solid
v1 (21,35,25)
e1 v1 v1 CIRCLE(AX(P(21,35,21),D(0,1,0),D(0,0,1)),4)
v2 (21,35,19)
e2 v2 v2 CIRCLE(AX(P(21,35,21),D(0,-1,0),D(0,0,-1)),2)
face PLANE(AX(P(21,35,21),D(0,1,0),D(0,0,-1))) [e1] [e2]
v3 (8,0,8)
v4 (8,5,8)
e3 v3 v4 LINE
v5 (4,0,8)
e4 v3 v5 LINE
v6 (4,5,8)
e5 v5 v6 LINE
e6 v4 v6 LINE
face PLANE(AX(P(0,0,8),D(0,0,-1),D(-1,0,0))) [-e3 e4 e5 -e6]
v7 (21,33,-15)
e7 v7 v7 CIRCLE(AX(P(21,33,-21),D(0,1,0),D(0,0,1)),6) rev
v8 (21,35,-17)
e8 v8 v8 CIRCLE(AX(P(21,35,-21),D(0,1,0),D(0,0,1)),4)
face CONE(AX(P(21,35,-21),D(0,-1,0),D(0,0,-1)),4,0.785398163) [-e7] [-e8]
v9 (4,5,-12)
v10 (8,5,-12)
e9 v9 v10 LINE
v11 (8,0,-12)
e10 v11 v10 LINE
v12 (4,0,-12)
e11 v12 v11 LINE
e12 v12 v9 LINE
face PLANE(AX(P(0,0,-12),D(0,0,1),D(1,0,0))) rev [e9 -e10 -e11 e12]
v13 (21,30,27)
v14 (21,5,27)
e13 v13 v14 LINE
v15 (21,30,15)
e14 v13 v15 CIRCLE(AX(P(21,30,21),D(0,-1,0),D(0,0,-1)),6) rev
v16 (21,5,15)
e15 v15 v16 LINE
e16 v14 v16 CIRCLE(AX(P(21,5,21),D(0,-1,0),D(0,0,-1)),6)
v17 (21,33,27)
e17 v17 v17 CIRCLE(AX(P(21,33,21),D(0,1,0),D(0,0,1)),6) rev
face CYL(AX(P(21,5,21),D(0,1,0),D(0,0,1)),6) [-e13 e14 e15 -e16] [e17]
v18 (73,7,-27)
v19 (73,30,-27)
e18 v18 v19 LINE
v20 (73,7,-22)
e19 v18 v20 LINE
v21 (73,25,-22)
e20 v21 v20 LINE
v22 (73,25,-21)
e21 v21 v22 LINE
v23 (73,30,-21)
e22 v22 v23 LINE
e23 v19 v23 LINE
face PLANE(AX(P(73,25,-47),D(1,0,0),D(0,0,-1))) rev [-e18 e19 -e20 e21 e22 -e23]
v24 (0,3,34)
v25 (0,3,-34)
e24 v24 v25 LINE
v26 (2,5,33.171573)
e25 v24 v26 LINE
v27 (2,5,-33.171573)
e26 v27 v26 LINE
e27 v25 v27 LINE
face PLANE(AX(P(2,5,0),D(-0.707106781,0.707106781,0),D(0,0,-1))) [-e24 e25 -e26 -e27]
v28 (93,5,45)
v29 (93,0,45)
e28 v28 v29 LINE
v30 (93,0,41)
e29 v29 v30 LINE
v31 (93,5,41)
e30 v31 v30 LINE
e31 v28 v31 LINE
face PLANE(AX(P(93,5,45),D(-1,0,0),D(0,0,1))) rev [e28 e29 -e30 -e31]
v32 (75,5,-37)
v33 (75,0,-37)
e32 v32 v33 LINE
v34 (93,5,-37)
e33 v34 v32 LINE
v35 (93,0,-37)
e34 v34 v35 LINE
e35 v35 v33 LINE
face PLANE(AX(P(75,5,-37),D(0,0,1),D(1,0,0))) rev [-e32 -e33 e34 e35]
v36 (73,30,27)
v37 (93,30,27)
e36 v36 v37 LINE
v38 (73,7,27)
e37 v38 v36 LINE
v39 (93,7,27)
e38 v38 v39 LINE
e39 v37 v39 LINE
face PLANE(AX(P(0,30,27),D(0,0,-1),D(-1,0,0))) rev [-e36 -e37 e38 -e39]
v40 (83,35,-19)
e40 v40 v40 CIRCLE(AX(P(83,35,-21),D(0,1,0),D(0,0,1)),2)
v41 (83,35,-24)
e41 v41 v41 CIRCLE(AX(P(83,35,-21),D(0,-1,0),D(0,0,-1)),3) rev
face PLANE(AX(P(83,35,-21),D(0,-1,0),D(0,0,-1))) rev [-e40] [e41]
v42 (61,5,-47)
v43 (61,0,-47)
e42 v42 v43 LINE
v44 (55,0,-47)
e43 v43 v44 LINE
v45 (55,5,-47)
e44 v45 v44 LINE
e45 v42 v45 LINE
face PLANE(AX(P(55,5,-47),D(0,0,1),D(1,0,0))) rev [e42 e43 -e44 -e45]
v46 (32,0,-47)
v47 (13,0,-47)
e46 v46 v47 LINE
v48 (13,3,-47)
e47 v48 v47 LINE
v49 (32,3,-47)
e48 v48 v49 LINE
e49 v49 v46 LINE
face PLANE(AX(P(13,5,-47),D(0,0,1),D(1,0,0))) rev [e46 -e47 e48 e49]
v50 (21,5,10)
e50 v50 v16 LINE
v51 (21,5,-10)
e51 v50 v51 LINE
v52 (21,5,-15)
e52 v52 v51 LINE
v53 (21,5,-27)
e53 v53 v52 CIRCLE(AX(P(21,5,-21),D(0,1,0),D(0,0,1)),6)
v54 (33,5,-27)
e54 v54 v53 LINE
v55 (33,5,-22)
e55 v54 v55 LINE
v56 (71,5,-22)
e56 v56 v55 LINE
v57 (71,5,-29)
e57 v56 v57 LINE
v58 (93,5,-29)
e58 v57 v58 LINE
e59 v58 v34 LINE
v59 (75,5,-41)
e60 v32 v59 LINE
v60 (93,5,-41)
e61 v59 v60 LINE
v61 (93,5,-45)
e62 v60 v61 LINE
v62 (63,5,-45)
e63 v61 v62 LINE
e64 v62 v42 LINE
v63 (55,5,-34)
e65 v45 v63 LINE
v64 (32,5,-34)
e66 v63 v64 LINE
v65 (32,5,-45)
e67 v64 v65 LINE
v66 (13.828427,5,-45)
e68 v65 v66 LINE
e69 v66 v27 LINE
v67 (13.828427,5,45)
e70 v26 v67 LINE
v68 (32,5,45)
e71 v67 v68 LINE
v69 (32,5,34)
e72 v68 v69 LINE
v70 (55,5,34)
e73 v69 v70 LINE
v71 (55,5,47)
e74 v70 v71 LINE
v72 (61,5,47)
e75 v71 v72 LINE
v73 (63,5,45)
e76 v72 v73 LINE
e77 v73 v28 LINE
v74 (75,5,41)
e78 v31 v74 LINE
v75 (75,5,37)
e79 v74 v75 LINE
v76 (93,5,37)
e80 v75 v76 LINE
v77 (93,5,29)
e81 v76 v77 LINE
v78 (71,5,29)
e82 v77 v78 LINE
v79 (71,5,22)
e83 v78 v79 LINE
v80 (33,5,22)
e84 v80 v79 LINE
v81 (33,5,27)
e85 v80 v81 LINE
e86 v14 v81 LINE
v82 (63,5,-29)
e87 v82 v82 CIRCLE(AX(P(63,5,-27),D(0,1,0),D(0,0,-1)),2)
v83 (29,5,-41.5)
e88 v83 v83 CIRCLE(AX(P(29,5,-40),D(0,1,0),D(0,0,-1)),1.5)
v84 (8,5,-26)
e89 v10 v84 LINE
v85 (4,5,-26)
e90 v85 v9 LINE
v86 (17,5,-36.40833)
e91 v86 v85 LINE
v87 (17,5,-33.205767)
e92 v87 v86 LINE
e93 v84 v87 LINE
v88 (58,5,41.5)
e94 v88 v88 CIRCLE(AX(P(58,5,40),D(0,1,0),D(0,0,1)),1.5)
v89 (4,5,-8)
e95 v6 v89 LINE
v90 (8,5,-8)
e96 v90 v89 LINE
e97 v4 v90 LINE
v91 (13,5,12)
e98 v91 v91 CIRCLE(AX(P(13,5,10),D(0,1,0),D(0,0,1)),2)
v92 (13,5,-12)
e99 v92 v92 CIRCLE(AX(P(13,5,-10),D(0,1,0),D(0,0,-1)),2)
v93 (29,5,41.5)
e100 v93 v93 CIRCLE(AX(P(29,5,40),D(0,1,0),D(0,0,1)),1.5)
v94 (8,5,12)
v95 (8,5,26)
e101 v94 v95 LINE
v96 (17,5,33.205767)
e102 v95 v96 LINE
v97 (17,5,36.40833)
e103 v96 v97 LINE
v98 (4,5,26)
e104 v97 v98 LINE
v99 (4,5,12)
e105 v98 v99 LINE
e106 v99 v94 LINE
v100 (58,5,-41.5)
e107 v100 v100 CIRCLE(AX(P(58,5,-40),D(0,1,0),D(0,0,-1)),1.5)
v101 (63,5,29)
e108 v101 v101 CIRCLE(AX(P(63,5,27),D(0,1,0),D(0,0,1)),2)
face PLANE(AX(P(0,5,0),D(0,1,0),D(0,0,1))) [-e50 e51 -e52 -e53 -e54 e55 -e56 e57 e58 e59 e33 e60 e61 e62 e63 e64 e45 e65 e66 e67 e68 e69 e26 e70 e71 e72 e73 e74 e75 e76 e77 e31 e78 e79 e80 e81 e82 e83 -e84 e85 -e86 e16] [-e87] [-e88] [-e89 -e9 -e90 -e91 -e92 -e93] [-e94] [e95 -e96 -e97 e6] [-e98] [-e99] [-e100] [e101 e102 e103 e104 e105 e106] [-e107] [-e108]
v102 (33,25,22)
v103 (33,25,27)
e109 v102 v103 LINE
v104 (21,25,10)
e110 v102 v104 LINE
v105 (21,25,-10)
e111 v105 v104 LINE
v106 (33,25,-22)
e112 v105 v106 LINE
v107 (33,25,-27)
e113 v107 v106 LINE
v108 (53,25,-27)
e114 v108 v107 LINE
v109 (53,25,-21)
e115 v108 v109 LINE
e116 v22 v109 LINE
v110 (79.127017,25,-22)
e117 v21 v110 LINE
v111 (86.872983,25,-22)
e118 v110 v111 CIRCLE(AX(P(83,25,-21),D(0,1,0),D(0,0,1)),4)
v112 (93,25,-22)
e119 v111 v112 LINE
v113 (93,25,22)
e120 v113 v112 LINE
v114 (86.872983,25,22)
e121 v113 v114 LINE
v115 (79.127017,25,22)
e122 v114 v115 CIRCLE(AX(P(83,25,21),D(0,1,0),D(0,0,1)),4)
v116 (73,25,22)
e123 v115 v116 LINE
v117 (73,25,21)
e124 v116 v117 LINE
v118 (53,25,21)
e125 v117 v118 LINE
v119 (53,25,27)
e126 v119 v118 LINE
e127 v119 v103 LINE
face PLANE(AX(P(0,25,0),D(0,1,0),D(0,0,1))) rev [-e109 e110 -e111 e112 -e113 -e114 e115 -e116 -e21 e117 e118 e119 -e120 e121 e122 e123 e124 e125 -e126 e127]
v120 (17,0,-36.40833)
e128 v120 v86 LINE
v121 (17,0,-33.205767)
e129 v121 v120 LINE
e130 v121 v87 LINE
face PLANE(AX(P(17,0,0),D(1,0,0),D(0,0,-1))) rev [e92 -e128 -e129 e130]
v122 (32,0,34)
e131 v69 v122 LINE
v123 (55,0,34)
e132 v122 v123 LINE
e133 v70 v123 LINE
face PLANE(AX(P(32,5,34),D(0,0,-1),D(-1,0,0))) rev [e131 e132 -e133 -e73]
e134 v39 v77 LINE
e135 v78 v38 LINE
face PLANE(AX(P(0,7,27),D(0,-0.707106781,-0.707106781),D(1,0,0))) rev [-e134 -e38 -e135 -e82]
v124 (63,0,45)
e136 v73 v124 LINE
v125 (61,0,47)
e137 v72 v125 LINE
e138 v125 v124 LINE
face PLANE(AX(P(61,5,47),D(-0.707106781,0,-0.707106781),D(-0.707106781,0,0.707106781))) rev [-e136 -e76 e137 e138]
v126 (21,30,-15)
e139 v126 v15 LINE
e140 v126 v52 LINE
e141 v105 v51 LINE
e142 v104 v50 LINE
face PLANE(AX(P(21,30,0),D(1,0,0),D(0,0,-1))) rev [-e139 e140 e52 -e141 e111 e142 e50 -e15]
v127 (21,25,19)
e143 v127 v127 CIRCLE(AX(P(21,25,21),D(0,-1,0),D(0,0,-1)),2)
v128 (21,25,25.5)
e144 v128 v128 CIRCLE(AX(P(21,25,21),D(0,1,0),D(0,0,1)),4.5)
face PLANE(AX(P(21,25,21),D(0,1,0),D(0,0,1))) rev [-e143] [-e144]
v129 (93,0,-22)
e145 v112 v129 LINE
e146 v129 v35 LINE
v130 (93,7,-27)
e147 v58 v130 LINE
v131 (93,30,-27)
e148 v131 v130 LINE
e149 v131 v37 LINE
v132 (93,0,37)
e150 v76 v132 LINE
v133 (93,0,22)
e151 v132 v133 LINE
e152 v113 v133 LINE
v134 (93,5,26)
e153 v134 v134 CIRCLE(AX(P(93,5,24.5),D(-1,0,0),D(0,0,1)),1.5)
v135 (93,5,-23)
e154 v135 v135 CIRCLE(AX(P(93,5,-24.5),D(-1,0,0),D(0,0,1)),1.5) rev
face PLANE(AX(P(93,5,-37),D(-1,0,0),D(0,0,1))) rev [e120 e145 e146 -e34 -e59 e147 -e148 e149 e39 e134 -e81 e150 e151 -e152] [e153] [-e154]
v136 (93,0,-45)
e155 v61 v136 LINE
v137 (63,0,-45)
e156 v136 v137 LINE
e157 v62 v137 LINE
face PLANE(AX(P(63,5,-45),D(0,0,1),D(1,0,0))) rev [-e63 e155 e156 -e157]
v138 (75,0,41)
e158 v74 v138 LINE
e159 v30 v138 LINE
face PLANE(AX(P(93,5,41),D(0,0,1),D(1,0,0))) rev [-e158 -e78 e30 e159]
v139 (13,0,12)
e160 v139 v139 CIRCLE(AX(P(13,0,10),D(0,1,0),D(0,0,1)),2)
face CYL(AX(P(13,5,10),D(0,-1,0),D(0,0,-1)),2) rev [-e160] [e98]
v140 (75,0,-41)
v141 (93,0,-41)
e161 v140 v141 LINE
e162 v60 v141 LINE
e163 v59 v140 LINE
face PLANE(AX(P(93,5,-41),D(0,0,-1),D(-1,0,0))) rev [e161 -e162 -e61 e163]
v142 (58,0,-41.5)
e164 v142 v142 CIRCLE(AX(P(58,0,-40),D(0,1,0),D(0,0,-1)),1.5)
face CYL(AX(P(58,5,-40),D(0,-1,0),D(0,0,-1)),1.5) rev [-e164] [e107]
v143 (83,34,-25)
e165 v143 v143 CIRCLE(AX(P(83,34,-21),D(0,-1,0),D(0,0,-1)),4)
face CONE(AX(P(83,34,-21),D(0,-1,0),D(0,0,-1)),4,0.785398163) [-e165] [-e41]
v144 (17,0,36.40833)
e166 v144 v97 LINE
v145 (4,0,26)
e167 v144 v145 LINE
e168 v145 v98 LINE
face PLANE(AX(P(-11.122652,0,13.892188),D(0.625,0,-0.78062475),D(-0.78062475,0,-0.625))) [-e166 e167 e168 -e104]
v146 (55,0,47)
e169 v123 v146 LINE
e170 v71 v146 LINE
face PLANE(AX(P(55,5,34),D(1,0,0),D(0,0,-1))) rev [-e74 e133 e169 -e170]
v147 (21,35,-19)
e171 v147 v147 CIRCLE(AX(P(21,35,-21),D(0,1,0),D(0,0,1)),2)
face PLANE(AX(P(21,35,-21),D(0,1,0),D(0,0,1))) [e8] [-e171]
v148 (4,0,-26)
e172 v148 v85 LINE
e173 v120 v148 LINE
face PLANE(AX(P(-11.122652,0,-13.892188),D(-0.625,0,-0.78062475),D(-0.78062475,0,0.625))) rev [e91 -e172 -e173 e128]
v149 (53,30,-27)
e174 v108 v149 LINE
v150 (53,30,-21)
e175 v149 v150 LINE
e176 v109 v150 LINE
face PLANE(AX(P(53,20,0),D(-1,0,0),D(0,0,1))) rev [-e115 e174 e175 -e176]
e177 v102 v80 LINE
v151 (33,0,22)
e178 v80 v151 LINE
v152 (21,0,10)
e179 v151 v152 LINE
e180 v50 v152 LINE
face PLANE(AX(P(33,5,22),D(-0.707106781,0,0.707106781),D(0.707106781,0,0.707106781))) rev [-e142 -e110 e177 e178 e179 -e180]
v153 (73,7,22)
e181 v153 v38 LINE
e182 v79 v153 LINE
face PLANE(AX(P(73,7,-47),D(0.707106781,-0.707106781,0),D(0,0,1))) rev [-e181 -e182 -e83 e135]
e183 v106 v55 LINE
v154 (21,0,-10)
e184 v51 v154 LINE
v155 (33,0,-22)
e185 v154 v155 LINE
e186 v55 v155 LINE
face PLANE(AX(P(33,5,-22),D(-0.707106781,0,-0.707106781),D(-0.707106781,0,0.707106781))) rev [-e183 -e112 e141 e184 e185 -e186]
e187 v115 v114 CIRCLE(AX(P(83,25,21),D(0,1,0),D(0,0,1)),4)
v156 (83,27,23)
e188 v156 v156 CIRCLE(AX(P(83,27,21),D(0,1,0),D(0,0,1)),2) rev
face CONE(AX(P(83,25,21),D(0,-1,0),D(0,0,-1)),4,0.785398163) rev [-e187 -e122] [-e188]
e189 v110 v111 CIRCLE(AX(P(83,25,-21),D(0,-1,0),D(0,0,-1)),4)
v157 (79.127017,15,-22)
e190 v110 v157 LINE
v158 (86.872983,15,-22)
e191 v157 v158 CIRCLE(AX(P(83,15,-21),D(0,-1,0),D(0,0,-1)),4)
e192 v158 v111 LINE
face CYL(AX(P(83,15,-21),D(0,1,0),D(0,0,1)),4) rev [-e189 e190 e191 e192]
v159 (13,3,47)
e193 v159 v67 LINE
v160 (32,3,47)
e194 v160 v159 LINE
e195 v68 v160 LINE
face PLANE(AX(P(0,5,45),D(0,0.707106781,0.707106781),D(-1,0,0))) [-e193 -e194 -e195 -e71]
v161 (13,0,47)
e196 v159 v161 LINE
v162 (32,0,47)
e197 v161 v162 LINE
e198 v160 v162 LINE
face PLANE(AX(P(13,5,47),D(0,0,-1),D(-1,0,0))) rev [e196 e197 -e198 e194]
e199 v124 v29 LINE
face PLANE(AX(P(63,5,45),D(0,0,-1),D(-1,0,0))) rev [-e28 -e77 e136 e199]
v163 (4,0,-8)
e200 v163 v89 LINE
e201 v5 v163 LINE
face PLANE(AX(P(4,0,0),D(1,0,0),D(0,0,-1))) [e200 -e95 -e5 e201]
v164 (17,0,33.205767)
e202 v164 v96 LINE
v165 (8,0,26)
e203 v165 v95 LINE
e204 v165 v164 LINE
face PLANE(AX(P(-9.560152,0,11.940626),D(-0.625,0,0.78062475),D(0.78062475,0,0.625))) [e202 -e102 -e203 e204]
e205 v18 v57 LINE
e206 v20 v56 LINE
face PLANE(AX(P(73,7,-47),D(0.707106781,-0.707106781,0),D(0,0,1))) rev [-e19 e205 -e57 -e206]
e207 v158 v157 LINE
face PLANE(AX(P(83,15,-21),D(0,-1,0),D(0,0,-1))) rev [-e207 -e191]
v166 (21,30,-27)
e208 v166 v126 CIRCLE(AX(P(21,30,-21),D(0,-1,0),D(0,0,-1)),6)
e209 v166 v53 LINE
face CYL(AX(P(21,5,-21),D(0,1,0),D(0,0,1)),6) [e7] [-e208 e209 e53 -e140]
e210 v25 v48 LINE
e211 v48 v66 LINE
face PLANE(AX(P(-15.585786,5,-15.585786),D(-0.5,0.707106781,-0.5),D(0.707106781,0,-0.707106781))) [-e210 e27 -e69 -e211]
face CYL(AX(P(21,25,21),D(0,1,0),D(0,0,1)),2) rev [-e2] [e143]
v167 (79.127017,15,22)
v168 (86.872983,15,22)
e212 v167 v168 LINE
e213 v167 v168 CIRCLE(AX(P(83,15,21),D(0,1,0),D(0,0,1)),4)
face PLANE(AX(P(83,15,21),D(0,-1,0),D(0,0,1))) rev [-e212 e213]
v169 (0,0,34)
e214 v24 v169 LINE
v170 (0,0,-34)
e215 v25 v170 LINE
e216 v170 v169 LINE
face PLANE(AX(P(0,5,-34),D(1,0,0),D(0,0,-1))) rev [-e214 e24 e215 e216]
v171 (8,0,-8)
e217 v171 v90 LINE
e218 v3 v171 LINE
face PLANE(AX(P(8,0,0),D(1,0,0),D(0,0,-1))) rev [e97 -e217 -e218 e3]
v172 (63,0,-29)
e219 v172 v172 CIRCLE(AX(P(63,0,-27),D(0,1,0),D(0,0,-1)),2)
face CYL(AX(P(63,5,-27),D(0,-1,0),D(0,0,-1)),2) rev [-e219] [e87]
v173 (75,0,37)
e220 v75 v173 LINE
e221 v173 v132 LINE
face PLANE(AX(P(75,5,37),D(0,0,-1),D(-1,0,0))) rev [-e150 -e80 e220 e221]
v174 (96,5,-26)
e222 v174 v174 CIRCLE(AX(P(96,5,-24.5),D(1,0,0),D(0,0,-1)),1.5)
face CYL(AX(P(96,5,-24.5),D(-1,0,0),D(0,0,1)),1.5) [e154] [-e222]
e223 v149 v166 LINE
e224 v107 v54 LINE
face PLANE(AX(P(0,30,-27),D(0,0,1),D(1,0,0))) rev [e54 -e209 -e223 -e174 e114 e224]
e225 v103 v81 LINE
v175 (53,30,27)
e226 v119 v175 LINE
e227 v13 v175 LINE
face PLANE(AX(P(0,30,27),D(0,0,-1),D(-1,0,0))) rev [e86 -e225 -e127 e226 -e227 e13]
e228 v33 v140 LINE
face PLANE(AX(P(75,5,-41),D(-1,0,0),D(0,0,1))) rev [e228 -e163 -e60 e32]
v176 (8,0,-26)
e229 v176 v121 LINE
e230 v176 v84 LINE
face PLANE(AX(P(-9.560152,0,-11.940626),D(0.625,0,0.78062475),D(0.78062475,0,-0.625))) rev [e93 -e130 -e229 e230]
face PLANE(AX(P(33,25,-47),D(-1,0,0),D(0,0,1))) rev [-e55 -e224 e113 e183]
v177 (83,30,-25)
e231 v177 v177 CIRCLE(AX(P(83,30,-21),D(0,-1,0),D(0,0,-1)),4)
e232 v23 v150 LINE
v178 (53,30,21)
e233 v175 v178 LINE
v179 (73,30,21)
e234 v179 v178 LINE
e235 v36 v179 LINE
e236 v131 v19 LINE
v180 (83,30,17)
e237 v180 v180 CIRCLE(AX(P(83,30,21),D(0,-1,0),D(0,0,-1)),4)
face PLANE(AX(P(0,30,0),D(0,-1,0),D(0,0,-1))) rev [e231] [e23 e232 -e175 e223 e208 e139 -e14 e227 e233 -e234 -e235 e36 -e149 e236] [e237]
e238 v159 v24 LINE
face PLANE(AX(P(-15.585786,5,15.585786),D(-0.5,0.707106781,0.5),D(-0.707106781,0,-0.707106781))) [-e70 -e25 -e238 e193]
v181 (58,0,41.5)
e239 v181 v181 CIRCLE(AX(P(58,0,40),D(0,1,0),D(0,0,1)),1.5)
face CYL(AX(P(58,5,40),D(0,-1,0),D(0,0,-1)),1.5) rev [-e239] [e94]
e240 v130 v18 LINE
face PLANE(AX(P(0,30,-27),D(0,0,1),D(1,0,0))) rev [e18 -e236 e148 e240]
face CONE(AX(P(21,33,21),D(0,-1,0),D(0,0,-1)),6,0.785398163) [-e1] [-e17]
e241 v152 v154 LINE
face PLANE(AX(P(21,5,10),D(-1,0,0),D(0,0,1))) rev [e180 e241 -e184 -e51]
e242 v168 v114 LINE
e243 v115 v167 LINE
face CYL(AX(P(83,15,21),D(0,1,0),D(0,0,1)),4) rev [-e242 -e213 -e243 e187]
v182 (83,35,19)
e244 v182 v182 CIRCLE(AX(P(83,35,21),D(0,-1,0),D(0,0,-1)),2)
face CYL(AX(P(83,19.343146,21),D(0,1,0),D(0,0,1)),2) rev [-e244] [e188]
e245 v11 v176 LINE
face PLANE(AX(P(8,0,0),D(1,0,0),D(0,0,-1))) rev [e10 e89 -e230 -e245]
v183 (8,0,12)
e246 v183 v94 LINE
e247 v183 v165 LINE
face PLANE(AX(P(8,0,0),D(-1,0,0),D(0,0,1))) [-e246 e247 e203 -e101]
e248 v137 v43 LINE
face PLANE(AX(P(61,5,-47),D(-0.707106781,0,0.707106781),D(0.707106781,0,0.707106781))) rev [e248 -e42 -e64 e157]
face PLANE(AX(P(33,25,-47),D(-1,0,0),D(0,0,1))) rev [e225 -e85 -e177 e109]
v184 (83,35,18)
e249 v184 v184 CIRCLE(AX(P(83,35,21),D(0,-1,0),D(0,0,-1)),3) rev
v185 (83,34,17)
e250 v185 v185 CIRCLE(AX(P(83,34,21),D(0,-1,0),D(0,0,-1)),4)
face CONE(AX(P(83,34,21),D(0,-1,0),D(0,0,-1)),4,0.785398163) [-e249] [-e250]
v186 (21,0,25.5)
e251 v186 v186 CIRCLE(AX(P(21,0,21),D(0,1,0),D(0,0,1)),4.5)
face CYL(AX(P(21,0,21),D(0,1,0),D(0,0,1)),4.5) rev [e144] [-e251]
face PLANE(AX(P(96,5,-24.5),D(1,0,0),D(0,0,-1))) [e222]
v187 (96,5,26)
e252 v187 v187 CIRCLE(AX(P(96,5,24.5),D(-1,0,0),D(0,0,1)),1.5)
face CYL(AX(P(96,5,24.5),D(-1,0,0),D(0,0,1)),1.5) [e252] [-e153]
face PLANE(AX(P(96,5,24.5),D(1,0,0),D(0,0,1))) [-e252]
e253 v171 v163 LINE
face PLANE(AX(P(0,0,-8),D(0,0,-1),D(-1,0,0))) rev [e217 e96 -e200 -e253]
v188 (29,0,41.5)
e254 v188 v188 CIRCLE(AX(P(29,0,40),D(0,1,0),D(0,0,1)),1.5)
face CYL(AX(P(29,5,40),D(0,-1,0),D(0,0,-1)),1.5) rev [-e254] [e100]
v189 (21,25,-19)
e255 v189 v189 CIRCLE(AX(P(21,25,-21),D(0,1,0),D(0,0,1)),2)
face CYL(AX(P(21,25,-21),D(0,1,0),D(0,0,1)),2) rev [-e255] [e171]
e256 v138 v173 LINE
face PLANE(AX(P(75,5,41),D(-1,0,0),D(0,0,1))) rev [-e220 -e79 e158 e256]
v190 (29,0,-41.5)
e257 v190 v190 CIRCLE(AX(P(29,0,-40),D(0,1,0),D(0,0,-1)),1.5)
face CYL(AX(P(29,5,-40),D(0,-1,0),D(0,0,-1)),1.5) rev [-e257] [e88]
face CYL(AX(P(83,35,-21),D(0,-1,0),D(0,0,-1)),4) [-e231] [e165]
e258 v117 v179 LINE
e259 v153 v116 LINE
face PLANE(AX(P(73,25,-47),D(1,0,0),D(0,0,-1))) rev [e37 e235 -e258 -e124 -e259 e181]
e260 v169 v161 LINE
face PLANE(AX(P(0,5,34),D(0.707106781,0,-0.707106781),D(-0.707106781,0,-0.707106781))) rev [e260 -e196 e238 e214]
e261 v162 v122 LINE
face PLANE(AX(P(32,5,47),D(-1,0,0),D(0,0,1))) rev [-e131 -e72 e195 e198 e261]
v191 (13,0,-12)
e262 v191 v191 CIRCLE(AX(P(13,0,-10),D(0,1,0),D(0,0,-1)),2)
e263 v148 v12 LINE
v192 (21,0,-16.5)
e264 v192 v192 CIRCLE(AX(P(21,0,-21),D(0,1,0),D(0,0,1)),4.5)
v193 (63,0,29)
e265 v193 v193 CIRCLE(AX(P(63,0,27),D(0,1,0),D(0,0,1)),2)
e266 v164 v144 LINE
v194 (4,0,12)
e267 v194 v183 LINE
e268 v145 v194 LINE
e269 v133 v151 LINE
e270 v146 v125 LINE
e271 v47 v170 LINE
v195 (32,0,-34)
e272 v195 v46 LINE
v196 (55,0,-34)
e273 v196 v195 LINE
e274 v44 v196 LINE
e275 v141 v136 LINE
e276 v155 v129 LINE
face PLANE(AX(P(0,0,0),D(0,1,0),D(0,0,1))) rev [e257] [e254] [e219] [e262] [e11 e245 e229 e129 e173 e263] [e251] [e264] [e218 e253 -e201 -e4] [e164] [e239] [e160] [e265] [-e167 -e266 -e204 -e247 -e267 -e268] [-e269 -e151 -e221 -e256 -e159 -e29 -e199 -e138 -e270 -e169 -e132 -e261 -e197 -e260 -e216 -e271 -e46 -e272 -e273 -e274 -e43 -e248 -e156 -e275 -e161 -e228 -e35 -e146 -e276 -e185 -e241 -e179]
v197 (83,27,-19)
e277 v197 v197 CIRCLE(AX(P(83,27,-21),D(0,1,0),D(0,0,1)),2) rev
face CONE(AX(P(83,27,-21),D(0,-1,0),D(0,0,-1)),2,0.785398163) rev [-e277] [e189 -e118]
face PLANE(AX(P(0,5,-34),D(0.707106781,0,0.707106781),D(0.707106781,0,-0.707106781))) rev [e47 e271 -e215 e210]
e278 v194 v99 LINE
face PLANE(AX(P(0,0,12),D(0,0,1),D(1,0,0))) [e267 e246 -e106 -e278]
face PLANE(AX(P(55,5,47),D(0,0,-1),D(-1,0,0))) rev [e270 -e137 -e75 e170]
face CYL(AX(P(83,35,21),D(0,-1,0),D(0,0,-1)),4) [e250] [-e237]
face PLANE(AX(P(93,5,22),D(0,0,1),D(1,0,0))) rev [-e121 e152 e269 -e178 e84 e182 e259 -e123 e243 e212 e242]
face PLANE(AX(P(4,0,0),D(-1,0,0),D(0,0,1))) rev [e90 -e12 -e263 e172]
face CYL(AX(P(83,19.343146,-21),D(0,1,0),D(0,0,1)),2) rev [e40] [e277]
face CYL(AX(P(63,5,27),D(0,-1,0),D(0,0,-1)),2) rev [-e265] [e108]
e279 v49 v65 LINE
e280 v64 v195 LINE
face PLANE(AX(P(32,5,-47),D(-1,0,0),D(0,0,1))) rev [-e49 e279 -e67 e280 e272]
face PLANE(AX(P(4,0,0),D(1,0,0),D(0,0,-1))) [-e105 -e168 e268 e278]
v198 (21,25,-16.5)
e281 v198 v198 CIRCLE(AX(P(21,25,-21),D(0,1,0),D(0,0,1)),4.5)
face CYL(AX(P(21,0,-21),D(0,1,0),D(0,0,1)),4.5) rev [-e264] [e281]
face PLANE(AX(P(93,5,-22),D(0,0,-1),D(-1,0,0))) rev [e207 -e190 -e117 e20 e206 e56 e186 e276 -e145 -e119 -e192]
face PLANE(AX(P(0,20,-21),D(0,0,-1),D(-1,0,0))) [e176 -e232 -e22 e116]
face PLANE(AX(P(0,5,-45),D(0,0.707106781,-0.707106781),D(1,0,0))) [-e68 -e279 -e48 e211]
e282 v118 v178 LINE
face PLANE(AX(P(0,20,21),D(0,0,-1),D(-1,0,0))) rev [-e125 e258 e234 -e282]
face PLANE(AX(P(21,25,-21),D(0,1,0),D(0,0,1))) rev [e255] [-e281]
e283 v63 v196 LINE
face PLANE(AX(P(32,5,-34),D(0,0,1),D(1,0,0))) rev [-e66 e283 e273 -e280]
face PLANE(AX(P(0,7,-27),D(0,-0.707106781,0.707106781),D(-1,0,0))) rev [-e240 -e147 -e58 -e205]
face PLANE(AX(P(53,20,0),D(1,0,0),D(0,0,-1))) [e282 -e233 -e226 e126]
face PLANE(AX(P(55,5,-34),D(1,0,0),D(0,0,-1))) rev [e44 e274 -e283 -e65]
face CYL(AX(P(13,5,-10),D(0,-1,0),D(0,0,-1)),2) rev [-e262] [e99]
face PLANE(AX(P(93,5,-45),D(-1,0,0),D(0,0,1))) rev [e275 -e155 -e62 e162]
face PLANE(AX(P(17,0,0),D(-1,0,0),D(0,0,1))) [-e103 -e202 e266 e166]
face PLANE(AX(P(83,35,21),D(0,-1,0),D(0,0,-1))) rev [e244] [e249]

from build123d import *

# Parameters (mm, degrees)
SKETCH1_R           = 2
SKETCH1_R_2         = 1.5
BOSS_EXTRUDE1_DEPTH = 5
SKETCH2_W           = 4
SKETCH2_H           = 16
CUT_EXTRUDE1_DEPTH  = 5
BOSS_EXTRUDE3_DEPTH = 25
SKETCH4_W           = 72
SKETCH4_H           = 54
BOSS_EXTRUDE4_DEPTH = 5
SKETCH5_W           = 40
SKETCH5_H           = 20
CUT_EXTRUDE2_DEPTH  = 123.576506721
SKETCH6_W           = 20
SKETCH6_H           = 6
CUT_EXTRUDE4_DEPTH  = 10
BOSS_EXTRUDE5_START = -5
SKETCH7_R           = 4
BOSS_EXTRUDE5_DEPTH = 5
SKETCH8_R           = 2
CUT_EXTRUDE5_DEPTH  = 10
CUT_EXTRUDE6_START  = 10
SKETCH9_R           = 4
CUT_EXTRUDE6_DEPTH  = 10
BOSS_EXTRUDE6_START = 5
SKETCH10_R          = 6
BOSS_EXTRUDE6_DEPTH = 30
SKETCH11_R          = 2
CUT_EXTRUDE7_DEPTH  = 10
CUT_EXTRUDE8_START  = 20
SKETCH12_R          = 4.5
CUT_EXTRUDE8_DEPTH  = 129.434311913
SKETCH14_R          = 4.5
CUT_EXTRUDE11_DEPTH = 108.158760724
SKETCH13_R          = 1.5
BOSS_EXTRUDE8_DEPTH = 3
CHAMFER2_SIZE       = 1
CHAMFER3_SIZE       = 2
CHAMFER4_SIZE       = 2
CHAMFER5_SIZE       = 2


with BuildPart() as part:
    # Sketch1 → Boss-Extrude1 (new body)
    with BuildSketch(Plane(origin=(0, 0, 0), x_dir=(1, 0, 0), z_dir=(0, 1, 0))):
        Polygon((0, 34), (0, -34), (13, -47), (32, -47), (32, -34), (55, -34), (55, -47), (61, -47), (63, -45), (93, -45), (93, -41), (75, -41), (75, -37), (93, -37), (93, -22), (33, -22), (21, -10), (21, 10), (33, 22), (93, 22), (93, 37), (75, 37), (75, 41), (93, 41), (93, 45), (63, 45), (61, 47), (55, 47), (55, 34), (32, 34), (32, 47), (13, 47), align=None)
        with Locations(Location((13, -10, 0), (0, 0, 270))):
            Circle(SKETCH1_R, mode=Mode.SUBTRACT)
        with Locations(Location((29, -40, 0), (0, 0, 270))):
            Circle(SKETCH1_R_2, mode=Mode.SUBTRACT)
        with Locations(Location((58, -40, 0), (0, 0, 270))):
            Circle(SKETCH1_R_2, mode=Mode.SUBTRACT)
        with Locations(Location((63, -27, 0), (0, 0, 270))):
            Circle(SKETCH1_R, mode=Mode.SUBTRACT)
        with Locations(Location((13, 10, 0), (0, 0, 90))):
            Circle(SKETCH1_R, mode=Mode.SUBTRACT)
        with Locations(Location((29, 40, 0), (0, 0, 90))):
            Circle(SKETCH1_R_2, mode=Mode.SUBTRACT)
        with Locations(Location((58, 40, 0), (0, 0, 90))):
            Circle(SKETCH1_R_2, mode=Mode.SUBTRACT)
        with Locations(Location((63, 27, 0), (0, 0, 90))):
            Circle(SKETCH1_R, mode=Mode.SUBTRACT)
    extrude(amount=BOSS_EXTRUDE1_DEPTH)

    # Sketch2 → Cut-Extrude1 (cut)
    with BuildSketch(Plane(origin=(0, 5, 0), x_dir=(1, 0, 0), z_dir=(0, 1, 0))):
        Polygon((17, 33.205766921), (17, 36.408329997), (4, 26), (4, 12), (8, 12), (8, 26), align=None)
        with Locations((6, 0)):
            Rectangle(SKETCH2_W, SKETCH2_H)
        Polygon((17, -33.205766921), (17, -36.408329997), (4, -26), (4, -12), (8, -12), (8, -26), align=None)
    extrude(amount=-CUT_EXTRUDE1_DEPTH, mode=Mode.SUBTRACT)

    # Sketch3 → Boss-Extrude3 (add)
    with BuildSketch(Plane(origin=(0, 5, 0), x_dir=(1, 0, 0), z_dir=(0, 1, 0))):
        Polygon((21, 27), (21, 10), (33, 22), (93, 22), (93, 27), align=None)
        Polygon((93, -27), (93, -22), (33, -22), (21, -10), (21, -27), align=None)
    extrude(amount=BOSS_EXTRUDE3_DEPTH)

    # Sketch4 → Boss-Extrude4 (add)
    with BuildSketch(Plane(origin=(0, 30, 0), x_dir=(1, 0, 0), z_dir=(0, 1, 0))):
        with Locations((57, 0)):
            Rectangle(SKETCH4_W, SKETCH4_H)
    extrude(amount=-BOSS_EXTRUDE4_DEPTH)

    # Sketch5 → Cut-Extrude2 (cut, through all)
    with BuildSketch(Plane.XY.offset(27)):
        with Locations((53, 15)):
            Rectangle(SKETCH5_W, SKETCH5_H)
    extrude(amount=-CUT_EXTRUDE2_DEPTH, mode=Mode.SUBTRACT)

    # Sketch6 → Cut-Extrude4 (cut)
    with BuildSketch(Plane(origin=(0, 30, 0), x_dir=(1, 0, 0), z_dir=(0, 1, 0))):
        with Locations((63, 24)):
            Rectangle(SKETCH6_W, SKETCH6_H)
        with Locations((63, -24)):
            Rectangle(SKETCH6_W, SKETCH6_H)
    extrude(amount=-CUT_EXTRUDE4_DEPTH, mode=Mode.SUBTRACT)

    # Sketch7 → Boss-Extrude5 (add)
    with BuildSketch(Plane.XZ.offset(-25).offset(BOSS_EXTRUDE5_START)):
        with Locations(Location((83, 21, 0), (0, 0, 270))):
            Circle(SKETCH7_R)
        with Locations(Location((83, -21, 0), (0, 0, 270))):
            Circle(SKETCH7_R)
    extrude(amount=-BOSS_EXTRUDE5_DEPTH)

    # Sketch8 → Cut-Extrude5 (cut)
    with BuildSketch(Plane(origin=(0, 35, 0), x_dir=(1, 0, 0), z_dir=(0, 1, 0))):
        with Locations(Location((83, 21, 0), (0, 0, 270))):
            Circle(SKETCH8_R)
    cut_extrude5 = extrude(amount=-CUT_EXTRUDE5_DEPTH, mode=Mode.SUBTRACT)

    # Sketch9 → Cut-Extrude6 (cut)
    with BuildSketch(Plane.XZ.offset(-25).offset(CUT_EXTRUDE6_START)):
        with Locations(Location((83, -21, 0), (0, 0, 270))):
            Circle(SKETCH9_R)
    cut_extrude6 = extrude(amount=-CUT_EXTRUDE6_DEPTH, mode=Mode.SUBTRACT)

    # Sketch10 → Boss-Extrude6 (add)
    with BuildSketch(Plane(origin=(0, 30, 0), x_dir=(1, 0, 0), z_dir=(0, 1, 0)).offset(BOSS_EXTRUDE6_START)):
        with Locations(Location((21, 21, 0), (0, 0, 270))):
            Circle(SKETCH10_R)
    boss_extrude6 = extrude(amount=-BOSS_EXTRUDE6_DEPTH)

    # Sketch11 → Cut-Extrude7 (cut)
    with BuildSketch(Plane(origin=(0, 35, 0), x_dir=(1, 0, 0), z_dir=(0, 1, 0))):
        with Locations(Location((21, 21, 0), (0, 0, 270))):
            Circle(SKETCH11_R)
    cut_extrude7 = extrude(amount=-CUT_EXTRUDE7_DEPTH, mode=Mode.SUBTRACT)

    # Sketch12 → Cut-Extrude8 (cut, through all)
    with BuildSketch(Plane(origin=(0, 5, 0), x_dir=(1, 0, 0), z_dir=(0, 1, 0)).offset(CUT_EXTRUDE8_START)):
        with Locations(Location((21, 21, 0), (0, 0, 270))):
            Circle(SKETCH12_R)
    extrude(amount=-CUT_EXTRUDE8_DEPTH, mode=Mode.SUBTRACT)

    # Mirror11: Cut-Extrude5, Cut-Extrude6 across plane
    add(cut_extrude5.mirror(Plane.XY), mode=Mode.SUBTRACT)
    add(cut_extrude6.mirror(Plane.XY), mode=Mode.SUBTRACT)

    # Mirror12: Boss-Extrude6 across plane
    add(boss_extrude6.mirror(Plane.XY))

    # Mirror16: Cut-Extrude7 across plane
    add(cut_extrude7.mirror(Plane.XY), mode=Mode.SUBTRACT)

    # Sketch14 → Cut-Extrude11 (cut, through all)
    with BuildSketch(Plane(origin=(0, 25, 0), x_dir=(1, 0, 0), z_dir=(0, 1, 0))):
        with Locations(Location((21, -21, 0), (0, 0, 270))):
            Circle(SKETCH14_R)
    extrude(amount=-CUT_EXTRUDE11_DEPTH, mode=Mode.SUBTRACT)

    # Sketch13 → Boss-Extrude8 (add)
    with BuildSketch(Plane(origin=(93, 0, 0), x_dir=(0, 0, -1), z_dir=(1, 0, 0))):
        with Locations(Location((24.5, 5, 0), (0, 0, 180))):
            Circle(SKETCH13_R)
    boss_extrude8 = extrude(amount=BOSS_EXTRUDE8_DEPTH)

    # Mirror19: Boss-Extrude8 across plane
    add(boss_extrude8.mirror(Plane.XY))

    # Chamfer2
    chamfer2_edges = [part.edges().sort_by_distance(p)[0] for p in [
        (83, 35, 25),
        (83, 35, -17),
    ]]
    chamfer(chamfer2_edges, length=CHAMFER2_SIZE)

    # Chamfer3
    chamfer3_edges = [part.edges().sort_by_distance(p)[0] for p in [
        (22.5, 5, -47),
        (6.5, 5, -40.5),
        (0, 5, 0),
        (6.5, 5, 40.5),
        (21, 35, -27),
        (21, 35, 27),
        (22.5, 5, 47),
    ]]
    chamfer(chamfer3_edges, length=CHAMFER3_SIZE)

    # Chamfer4
    chamfer4_edges = [part.edges().sort_by_distance(p)[0] for p in [
        (83, 5, -27),
        (83, 5, 27),
        (73, 5, 24.5),
        (73, 5, -24.5),
    ]]
    chamfer(chamfer4_edges, length=CHAMFER4_SIZE)

    # Chamfer5
    chamfer5_edges = [part.edges().sort_by_distance(p)[0] for p in [
        (83, 25, -23),
        (83, 25, 23),
    ]]
    chamfer(chamfer5_edges, length=CHAMFER5_SIZE - 0.0001)  # a hair under: the kernel refuses the full size


solid = part.part
